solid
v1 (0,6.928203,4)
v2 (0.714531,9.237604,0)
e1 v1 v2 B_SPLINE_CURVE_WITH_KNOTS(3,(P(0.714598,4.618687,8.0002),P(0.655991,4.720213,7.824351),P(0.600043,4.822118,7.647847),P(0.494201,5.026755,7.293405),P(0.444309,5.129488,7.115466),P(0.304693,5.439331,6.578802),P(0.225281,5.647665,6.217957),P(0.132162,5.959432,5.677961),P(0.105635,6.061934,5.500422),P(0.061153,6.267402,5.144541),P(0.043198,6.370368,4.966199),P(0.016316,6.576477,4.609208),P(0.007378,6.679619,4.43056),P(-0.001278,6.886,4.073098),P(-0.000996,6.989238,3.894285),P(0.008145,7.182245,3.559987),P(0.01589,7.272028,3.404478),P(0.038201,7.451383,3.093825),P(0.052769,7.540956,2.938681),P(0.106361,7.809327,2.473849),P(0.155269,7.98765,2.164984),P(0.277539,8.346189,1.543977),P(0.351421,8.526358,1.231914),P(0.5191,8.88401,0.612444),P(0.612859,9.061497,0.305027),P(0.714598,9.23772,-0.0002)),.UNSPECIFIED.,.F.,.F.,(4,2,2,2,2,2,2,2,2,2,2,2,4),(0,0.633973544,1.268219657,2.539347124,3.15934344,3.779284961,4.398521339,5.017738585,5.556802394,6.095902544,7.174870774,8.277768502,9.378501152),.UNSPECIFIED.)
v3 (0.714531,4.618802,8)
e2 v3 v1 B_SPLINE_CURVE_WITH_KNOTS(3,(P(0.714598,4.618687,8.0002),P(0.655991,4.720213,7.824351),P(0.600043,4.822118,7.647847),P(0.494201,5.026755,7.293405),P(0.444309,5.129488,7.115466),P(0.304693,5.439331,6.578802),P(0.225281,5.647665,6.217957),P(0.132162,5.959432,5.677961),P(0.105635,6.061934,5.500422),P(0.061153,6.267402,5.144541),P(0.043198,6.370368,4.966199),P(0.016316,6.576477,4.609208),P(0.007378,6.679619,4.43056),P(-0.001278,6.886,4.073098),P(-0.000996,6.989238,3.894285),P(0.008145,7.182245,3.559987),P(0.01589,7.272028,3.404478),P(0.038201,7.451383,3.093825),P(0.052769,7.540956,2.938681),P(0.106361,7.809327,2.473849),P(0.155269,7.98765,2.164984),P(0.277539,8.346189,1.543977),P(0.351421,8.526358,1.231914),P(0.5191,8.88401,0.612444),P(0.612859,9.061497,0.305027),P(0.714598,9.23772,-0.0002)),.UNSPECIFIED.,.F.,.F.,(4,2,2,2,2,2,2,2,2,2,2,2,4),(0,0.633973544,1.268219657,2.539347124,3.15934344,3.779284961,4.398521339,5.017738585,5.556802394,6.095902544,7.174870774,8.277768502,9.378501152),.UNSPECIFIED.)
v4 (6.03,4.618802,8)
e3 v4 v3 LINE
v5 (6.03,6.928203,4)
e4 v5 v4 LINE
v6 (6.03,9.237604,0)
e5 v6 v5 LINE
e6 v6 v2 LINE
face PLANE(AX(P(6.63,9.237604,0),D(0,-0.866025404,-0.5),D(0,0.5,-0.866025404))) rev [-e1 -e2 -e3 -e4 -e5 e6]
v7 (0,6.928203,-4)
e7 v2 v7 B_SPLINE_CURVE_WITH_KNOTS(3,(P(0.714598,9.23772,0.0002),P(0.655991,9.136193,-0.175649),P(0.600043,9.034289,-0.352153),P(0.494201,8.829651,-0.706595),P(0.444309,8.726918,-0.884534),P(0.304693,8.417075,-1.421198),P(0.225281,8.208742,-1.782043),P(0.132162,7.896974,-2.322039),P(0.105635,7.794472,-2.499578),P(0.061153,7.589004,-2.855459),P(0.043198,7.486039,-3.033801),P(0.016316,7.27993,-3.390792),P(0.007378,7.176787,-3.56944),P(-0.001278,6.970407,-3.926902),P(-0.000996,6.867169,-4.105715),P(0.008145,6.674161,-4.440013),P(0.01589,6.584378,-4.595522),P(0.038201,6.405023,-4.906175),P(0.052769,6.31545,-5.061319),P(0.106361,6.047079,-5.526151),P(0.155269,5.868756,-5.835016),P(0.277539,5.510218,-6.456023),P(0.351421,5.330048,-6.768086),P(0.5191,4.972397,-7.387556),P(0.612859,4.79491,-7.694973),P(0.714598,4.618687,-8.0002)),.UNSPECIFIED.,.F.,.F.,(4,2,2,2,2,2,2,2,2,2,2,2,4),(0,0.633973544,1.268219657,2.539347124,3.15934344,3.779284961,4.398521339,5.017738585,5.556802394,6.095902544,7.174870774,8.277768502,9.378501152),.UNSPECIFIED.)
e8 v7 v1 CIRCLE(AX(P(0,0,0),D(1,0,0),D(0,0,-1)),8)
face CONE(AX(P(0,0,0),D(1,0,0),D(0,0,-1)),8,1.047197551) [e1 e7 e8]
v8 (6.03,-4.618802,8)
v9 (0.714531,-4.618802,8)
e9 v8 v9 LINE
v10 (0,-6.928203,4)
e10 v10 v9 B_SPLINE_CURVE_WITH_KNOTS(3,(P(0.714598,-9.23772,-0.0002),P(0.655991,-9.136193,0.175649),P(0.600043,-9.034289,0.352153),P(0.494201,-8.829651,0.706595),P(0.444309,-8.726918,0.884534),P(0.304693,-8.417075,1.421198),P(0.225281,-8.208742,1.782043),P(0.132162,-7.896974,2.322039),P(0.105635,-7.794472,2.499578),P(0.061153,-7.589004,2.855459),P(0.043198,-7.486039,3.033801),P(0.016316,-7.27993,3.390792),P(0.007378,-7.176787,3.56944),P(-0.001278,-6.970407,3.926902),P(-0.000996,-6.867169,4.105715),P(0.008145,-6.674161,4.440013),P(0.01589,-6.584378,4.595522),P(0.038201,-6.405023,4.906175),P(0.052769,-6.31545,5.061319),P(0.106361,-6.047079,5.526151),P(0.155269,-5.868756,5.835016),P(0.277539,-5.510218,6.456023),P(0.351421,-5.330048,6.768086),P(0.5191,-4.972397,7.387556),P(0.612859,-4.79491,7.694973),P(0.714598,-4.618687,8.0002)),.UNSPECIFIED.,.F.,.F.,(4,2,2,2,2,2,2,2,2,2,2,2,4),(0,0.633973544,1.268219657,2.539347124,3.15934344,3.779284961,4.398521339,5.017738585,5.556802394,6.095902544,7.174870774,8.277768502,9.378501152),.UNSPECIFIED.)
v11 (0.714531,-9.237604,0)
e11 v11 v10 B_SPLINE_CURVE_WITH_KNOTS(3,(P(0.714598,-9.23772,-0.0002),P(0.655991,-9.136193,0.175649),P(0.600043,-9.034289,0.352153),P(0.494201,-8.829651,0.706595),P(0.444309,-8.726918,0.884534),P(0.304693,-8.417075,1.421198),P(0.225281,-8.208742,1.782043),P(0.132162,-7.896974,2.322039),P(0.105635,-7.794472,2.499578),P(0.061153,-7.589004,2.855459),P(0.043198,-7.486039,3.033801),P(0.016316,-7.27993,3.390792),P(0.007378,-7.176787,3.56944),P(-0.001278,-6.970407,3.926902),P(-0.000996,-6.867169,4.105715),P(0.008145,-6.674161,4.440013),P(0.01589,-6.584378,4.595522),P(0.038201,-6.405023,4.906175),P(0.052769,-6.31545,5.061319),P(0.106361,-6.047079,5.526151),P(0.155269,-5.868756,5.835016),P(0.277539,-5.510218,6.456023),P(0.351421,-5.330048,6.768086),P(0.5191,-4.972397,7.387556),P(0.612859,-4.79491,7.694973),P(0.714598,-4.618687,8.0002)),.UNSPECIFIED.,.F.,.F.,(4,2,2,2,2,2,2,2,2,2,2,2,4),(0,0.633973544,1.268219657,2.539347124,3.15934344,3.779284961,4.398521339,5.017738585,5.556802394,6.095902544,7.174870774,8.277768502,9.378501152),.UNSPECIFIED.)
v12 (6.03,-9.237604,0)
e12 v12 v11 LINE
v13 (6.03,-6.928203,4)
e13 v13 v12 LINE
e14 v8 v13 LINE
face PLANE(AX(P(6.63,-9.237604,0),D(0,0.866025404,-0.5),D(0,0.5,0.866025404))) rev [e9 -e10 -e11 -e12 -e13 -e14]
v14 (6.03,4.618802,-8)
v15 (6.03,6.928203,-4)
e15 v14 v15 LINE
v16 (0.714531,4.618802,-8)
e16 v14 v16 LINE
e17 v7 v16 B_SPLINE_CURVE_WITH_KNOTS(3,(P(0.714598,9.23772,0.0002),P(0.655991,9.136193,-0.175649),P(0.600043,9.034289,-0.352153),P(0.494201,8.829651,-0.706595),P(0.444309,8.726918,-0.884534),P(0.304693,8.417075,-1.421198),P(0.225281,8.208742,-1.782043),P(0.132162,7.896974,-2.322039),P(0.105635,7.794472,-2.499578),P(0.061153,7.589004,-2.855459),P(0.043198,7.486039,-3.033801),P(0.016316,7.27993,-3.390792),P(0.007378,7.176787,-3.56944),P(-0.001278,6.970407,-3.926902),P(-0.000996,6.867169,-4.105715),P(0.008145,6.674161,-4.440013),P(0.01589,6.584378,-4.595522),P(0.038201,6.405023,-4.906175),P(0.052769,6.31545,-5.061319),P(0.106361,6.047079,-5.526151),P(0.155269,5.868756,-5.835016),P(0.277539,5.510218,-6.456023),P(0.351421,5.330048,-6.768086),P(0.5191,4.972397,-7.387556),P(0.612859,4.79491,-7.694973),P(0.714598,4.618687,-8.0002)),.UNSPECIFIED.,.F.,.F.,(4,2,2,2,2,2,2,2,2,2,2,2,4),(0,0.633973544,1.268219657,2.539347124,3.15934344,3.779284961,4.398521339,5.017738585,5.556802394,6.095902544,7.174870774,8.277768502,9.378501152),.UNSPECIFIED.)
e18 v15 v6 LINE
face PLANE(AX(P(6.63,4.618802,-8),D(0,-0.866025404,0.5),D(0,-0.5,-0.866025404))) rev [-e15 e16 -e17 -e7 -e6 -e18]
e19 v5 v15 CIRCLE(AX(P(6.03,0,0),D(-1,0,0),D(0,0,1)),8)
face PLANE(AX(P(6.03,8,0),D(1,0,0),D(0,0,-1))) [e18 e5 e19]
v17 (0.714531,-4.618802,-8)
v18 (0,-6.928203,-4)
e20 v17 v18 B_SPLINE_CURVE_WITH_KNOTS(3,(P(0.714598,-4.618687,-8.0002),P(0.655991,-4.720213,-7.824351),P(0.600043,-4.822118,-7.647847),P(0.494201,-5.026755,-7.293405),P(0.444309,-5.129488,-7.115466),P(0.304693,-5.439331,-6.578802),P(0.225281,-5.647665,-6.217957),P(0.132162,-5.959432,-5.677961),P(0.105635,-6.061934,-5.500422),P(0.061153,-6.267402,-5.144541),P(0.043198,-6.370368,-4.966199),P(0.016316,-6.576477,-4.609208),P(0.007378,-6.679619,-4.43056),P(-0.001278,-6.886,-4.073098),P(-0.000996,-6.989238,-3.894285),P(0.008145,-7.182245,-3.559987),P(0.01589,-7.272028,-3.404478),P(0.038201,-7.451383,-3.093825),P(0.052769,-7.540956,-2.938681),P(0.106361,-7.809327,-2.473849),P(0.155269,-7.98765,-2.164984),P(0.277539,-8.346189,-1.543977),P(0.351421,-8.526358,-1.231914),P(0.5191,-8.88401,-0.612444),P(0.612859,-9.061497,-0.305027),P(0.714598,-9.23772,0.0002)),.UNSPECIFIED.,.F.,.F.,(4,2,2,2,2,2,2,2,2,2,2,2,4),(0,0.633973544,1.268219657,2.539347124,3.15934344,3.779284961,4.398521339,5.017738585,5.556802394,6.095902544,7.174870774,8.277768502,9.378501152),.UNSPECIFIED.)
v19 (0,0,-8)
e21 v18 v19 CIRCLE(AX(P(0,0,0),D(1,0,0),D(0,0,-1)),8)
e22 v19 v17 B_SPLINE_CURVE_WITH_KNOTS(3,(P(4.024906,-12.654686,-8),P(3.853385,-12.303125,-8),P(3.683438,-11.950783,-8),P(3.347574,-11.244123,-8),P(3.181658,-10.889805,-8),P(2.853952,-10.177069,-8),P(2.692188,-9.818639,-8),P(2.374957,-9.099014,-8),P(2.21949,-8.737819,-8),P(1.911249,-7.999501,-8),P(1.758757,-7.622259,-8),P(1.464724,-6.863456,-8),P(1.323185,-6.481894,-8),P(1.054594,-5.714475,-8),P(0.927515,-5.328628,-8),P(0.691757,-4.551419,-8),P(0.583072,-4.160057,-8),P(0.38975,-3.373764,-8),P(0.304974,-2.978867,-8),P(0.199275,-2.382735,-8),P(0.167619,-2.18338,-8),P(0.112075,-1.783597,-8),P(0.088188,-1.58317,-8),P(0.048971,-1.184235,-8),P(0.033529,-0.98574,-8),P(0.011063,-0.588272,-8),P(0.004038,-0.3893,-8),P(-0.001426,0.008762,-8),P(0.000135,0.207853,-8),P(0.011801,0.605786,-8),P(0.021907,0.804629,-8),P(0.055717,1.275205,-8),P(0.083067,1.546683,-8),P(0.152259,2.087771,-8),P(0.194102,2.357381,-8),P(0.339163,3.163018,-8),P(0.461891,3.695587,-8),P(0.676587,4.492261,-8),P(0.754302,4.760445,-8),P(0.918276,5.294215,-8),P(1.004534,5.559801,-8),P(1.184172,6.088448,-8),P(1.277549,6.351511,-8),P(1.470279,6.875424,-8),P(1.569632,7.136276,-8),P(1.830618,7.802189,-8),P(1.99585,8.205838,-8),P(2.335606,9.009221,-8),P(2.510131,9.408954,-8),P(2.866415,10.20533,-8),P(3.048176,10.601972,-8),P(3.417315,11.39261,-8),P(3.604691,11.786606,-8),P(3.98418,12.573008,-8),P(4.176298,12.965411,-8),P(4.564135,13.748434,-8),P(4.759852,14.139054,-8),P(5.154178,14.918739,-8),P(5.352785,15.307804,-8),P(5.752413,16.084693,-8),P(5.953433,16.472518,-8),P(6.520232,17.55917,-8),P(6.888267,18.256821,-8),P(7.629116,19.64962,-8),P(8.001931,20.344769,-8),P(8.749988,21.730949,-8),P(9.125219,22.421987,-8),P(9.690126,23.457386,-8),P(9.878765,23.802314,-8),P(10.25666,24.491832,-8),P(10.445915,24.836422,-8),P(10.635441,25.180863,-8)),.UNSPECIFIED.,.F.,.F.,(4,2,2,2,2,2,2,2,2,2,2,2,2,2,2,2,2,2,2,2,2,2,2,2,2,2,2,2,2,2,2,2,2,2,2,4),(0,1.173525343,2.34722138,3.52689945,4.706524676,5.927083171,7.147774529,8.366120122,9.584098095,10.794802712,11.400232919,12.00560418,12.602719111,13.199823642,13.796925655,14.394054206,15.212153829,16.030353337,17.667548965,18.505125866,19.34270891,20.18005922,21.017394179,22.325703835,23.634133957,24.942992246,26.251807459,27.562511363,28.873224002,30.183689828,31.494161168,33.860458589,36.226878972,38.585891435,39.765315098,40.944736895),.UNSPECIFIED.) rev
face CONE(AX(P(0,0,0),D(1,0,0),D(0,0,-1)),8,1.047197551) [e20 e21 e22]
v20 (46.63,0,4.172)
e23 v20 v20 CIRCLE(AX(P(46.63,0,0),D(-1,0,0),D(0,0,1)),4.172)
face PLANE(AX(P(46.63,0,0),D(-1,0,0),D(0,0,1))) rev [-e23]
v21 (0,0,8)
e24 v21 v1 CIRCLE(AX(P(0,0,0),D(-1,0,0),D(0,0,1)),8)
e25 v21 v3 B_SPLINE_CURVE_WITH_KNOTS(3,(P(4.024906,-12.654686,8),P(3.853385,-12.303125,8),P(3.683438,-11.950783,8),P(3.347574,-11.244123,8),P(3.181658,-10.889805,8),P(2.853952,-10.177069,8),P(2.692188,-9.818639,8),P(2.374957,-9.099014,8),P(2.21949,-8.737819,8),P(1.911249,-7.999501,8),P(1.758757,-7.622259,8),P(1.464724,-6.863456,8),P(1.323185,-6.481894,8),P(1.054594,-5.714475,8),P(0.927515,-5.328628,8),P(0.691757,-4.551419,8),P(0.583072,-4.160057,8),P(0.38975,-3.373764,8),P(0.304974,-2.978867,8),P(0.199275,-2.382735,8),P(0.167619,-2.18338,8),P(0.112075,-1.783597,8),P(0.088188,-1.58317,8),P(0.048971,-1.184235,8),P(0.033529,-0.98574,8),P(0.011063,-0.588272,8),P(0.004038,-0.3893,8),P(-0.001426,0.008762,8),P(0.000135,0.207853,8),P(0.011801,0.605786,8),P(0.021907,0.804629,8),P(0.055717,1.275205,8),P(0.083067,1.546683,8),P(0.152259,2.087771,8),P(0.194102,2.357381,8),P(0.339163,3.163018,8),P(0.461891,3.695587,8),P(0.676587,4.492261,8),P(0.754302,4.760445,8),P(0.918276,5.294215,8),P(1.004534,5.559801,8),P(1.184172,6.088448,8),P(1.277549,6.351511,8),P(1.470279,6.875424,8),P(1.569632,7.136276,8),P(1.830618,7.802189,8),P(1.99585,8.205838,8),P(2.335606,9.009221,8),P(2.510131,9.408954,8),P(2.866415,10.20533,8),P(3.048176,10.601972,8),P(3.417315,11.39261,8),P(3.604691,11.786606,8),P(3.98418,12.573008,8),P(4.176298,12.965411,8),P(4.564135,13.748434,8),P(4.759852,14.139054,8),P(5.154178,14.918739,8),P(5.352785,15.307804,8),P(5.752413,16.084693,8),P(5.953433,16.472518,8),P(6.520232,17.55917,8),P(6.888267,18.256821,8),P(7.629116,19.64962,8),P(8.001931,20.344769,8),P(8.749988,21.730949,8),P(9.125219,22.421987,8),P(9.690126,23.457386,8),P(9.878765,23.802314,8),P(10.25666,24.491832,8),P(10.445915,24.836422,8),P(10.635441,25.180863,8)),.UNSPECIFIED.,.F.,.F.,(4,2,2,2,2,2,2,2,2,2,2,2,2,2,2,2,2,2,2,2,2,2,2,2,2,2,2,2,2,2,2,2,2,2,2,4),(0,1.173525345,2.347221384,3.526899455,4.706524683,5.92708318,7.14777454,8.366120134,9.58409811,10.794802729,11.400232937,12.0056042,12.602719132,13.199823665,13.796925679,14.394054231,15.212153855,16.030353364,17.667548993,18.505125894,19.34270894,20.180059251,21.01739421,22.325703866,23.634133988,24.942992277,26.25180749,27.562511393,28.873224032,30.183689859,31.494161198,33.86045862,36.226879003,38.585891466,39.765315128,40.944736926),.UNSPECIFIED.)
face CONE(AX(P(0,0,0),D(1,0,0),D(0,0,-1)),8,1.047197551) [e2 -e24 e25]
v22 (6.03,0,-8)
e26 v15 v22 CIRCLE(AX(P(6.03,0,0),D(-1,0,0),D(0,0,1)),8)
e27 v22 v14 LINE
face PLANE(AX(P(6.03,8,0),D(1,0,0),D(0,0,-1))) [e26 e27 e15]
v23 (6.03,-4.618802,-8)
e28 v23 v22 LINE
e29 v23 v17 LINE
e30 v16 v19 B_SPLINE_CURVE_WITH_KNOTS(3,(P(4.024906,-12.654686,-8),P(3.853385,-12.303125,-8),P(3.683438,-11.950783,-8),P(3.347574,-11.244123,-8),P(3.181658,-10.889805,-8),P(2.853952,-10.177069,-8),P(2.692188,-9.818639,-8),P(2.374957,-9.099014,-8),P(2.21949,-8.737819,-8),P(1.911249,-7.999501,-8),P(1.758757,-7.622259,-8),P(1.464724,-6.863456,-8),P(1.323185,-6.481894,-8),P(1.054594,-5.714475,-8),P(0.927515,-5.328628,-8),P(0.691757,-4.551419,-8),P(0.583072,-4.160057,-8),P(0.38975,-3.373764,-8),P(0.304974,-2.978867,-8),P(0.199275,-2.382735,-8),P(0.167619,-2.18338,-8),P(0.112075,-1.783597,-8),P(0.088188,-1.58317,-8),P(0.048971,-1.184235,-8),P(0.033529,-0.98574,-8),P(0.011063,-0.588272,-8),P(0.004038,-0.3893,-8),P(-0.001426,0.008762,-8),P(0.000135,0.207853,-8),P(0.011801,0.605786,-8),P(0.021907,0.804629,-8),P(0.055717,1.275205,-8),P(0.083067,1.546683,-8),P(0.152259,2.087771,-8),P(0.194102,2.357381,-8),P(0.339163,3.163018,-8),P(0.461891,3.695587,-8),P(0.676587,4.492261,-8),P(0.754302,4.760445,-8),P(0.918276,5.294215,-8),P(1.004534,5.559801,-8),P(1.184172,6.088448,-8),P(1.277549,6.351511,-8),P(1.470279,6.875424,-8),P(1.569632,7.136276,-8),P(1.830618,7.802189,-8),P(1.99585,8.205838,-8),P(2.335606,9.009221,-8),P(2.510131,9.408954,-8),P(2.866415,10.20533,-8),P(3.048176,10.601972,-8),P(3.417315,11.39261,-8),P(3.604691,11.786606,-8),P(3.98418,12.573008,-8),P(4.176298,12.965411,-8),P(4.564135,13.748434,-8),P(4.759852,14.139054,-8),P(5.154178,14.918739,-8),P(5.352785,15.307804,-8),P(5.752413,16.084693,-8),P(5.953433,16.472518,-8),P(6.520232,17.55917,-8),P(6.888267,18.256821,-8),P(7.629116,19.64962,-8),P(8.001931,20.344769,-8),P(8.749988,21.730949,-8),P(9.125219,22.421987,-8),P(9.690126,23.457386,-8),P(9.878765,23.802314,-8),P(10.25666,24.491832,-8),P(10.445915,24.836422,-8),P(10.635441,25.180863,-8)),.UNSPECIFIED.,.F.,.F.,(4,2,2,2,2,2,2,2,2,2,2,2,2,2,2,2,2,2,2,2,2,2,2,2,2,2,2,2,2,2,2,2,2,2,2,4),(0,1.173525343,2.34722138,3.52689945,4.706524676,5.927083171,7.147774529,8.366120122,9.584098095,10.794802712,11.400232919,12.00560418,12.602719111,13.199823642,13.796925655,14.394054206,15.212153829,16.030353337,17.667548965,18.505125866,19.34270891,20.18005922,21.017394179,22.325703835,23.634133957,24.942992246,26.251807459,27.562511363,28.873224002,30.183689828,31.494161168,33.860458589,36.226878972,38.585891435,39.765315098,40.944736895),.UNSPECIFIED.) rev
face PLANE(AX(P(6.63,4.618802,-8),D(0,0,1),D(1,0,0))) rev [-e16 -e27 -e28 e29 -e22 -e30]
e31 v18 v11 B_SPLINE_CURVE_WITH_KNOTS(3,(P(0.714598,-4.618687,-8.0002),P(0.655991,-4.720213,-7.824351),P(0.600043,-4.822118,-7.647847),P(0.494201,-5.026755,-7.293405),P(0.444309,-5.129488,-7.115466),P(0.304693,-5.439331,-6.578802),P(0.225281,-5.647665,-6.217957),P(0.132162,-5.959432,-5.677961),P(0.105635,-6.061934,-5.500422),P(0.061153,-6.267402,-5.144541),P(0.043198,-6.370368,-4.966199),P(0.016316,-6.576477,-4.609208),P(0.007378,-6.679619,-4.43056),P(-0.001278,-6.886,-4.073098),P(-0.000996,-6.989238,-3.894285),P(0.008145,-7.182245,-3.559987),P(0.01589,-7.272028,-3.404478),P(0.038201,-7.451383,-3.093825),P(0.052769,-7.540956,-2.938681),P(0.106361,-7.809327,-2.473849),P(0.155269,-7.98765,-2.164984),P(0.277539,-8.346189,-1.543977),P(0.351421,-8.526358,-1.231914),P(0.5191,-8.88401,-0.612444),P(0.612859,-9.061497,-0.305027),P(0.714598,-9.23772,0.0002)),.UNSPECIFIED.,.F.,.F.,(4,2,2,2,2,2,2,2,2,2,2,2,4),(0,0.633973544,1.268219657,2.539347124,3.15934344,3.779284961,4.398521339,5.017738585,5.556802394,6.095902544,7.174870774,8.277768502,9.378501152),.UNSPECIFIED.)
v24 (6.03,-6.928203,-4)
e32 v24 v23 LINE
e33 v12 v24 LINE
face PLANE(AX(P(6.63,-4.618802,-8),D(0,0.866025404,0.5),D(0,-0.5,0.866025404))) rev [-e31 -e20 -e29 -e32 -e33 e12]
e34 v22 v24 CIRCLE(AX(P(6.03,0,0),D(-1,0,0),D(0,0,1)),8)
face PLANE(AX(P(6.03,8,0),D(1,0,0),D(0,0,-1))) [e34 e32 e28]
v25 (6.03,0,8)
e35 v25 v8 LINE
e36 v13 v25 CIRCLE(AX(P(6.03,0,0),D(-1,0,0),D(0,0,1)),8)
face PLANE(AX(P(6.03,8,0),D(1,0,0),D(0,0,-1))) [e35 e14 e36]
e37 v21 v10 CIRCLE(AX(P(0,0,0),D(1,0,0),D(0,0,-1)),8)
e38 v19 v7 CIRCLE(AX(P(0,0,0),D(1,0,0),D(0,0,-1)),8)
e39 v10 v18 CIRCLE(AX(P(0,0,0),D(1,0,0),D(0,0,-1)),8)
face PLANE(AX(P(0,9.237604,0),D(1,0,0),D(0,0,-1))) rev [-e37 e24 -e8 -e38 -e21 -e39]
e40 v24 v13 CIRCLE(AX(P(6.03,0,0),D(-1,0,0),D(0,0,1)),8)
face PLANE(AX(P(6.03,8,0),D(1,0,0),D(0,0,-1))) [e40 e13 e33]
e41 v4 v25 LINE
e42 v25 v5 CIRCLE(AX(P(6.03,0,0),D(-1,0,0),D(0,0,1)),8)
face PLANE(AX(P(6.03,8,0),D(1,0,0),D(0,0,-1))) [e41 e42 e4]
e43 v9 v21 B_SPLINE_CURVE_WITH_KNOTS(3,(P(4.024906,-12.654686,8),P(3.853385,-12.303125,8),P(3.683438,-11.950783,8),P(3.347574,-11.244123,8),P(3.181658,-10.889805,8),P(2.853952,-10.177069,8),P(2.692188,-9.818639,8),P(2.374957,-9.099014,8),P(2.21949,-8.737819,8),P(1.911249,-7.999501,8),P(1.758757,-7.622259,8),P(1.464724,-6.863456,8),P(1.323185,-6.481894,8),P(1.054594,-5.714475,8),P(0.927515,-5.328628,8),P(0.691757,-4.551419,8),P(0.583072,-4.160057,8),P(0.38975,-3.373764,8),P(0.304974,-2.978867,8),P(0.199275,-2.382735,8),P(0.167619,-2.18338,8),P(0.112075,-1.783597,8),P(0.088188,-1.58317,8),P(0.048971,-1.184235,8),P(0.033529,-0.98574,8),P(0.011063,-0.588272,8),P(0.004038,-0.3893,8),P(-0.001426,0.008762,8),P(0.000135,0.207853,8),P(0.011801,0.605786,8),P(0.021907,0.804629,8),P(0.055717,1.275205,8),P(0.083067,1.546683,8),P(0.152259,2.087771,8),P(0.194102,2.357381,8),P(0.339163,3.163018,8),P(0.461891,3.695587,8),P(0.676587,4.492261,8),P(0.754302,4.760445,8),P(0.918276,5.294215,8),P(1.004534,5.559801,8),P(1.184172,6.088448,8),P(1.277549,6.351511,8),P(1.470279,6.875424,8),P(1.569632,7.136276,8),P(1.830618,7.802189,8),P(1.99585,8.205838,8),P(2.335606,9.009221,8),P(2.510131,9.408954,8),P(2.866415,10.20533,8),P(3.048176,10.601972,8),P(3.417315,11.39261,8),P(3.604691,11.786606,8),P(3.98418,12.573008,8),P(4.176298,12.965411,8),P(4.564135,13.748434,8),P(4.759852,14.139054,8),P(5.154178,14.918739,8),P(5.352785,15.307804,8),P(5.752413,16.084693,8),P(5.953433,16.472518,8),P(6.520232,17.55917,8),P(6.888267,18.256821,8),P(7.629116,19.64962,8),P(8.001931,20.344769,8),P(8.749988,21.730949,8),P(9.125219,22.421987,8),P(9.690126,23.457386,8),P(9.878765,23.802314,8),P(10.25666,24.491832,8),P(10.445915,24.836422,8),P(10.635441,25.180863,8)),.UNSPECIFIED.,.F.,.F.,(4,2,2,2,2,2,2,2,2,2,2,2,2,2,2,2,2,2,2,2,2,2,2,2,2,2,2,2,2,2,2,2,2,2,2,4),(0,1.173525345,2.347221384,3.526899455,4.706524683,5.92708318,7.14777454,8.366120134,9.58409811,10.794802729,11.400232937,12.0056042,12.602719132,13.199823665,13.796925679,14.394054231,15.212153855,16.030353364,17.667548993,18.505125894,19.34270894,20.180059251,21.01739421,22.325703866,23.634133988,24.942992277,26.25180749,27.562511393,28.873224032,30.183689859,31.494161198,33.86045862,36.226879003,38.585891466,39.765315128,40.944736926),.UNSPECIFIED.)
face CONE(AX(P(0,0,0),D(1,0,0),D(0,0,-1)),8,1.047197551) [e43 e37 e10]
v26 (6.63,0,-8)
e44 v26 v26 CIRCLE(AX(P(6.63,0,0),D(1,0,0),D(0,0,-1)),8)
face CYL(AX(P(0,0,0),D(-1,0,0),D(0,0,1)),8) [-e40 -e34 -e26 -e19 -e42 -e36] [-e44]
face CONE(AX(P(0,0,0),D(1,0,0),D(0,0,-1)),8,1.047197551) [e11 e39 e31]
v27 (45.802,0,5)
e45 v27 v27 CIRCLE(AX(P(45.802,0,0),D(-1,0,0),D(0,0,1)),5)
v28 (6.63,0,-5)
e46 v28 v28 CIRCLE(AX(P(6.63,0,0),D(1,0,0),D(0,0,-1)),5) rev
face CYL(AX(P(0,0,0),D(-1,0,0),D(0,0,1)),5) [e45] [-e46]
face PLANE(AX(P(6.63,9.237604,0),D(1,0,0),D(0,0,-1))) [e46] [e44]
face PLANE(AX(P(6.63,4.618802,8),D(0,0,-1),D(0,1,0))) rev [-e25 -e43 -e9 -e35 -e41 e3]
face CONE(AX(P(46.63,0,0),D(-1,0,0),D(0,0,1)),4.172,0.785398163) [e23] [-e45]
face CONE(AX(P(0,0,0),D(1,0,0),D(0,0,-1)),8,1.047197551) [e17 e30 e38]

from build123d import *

# Parameters (mm, degrees)
BASEHEAD_DEPTH = 6.63
SKETCH4_W      = 0.6
SKETCH4_H      = 11.237604307


# Read off the part's stored shape, not the designer's step: HeadChamfer
with BuildPart() as part:
    # Sketch1 → BaseHead (new body)
    with BuildSketch(Plane(origin=(0, 0, 0), x_dir=(0, 0, -1), z_dir=(1, 0, 0))):
        Polygon((8, 4.618802154), (8, -4.618802154), (0, -9.237604307), (-8, -4.618802154), (-8, 4.618802154), (0, 9.237604307), align=None)
    extrude(amount=BASEHEAD_DEPTH)

    # HeadChamfer outline → HeadChamfer (revolve, cut)
    with BuildSketch(Plane.YX):
        Polygon((9.237604311, 0.714531182), (8, 0), (9.237604311, 0), align=None)
    revolve(axis=Axis((0, 0, 0), (1, 0, 0)), mode=Mode.SUBTRACT)

    # HeadChamfer 2 outline → HeadChamfer 2 (revolve)
    with BuildSketch(Plane.YX):
        Polygon((5, 6.63), (5, 45.802), (4.172, 46.63), (0, 46.63), (0, 6.63), align=None)
    revolve(axis=Axis((0, 0, 0), (1, 0, 0)))

    # Sketch4 → BearingFace (revolve, cut)
    with BuildSketch(Plane.XY, mode=Mode.PRIVATE) as bearingface_sk:
        with Locations((6.33, 13.618802154)):
            Rectangle(SKETCH4_W, SKETCH4_H)
    revolve(bearingface_sk.sketch.rotate(Axis((0, 0, 0), (1, 0, 0)), 90), axis=Axis((0, 0, 0), (1, 0, 0)), mode=Mode.SUBTRACT)


solid = part.part
